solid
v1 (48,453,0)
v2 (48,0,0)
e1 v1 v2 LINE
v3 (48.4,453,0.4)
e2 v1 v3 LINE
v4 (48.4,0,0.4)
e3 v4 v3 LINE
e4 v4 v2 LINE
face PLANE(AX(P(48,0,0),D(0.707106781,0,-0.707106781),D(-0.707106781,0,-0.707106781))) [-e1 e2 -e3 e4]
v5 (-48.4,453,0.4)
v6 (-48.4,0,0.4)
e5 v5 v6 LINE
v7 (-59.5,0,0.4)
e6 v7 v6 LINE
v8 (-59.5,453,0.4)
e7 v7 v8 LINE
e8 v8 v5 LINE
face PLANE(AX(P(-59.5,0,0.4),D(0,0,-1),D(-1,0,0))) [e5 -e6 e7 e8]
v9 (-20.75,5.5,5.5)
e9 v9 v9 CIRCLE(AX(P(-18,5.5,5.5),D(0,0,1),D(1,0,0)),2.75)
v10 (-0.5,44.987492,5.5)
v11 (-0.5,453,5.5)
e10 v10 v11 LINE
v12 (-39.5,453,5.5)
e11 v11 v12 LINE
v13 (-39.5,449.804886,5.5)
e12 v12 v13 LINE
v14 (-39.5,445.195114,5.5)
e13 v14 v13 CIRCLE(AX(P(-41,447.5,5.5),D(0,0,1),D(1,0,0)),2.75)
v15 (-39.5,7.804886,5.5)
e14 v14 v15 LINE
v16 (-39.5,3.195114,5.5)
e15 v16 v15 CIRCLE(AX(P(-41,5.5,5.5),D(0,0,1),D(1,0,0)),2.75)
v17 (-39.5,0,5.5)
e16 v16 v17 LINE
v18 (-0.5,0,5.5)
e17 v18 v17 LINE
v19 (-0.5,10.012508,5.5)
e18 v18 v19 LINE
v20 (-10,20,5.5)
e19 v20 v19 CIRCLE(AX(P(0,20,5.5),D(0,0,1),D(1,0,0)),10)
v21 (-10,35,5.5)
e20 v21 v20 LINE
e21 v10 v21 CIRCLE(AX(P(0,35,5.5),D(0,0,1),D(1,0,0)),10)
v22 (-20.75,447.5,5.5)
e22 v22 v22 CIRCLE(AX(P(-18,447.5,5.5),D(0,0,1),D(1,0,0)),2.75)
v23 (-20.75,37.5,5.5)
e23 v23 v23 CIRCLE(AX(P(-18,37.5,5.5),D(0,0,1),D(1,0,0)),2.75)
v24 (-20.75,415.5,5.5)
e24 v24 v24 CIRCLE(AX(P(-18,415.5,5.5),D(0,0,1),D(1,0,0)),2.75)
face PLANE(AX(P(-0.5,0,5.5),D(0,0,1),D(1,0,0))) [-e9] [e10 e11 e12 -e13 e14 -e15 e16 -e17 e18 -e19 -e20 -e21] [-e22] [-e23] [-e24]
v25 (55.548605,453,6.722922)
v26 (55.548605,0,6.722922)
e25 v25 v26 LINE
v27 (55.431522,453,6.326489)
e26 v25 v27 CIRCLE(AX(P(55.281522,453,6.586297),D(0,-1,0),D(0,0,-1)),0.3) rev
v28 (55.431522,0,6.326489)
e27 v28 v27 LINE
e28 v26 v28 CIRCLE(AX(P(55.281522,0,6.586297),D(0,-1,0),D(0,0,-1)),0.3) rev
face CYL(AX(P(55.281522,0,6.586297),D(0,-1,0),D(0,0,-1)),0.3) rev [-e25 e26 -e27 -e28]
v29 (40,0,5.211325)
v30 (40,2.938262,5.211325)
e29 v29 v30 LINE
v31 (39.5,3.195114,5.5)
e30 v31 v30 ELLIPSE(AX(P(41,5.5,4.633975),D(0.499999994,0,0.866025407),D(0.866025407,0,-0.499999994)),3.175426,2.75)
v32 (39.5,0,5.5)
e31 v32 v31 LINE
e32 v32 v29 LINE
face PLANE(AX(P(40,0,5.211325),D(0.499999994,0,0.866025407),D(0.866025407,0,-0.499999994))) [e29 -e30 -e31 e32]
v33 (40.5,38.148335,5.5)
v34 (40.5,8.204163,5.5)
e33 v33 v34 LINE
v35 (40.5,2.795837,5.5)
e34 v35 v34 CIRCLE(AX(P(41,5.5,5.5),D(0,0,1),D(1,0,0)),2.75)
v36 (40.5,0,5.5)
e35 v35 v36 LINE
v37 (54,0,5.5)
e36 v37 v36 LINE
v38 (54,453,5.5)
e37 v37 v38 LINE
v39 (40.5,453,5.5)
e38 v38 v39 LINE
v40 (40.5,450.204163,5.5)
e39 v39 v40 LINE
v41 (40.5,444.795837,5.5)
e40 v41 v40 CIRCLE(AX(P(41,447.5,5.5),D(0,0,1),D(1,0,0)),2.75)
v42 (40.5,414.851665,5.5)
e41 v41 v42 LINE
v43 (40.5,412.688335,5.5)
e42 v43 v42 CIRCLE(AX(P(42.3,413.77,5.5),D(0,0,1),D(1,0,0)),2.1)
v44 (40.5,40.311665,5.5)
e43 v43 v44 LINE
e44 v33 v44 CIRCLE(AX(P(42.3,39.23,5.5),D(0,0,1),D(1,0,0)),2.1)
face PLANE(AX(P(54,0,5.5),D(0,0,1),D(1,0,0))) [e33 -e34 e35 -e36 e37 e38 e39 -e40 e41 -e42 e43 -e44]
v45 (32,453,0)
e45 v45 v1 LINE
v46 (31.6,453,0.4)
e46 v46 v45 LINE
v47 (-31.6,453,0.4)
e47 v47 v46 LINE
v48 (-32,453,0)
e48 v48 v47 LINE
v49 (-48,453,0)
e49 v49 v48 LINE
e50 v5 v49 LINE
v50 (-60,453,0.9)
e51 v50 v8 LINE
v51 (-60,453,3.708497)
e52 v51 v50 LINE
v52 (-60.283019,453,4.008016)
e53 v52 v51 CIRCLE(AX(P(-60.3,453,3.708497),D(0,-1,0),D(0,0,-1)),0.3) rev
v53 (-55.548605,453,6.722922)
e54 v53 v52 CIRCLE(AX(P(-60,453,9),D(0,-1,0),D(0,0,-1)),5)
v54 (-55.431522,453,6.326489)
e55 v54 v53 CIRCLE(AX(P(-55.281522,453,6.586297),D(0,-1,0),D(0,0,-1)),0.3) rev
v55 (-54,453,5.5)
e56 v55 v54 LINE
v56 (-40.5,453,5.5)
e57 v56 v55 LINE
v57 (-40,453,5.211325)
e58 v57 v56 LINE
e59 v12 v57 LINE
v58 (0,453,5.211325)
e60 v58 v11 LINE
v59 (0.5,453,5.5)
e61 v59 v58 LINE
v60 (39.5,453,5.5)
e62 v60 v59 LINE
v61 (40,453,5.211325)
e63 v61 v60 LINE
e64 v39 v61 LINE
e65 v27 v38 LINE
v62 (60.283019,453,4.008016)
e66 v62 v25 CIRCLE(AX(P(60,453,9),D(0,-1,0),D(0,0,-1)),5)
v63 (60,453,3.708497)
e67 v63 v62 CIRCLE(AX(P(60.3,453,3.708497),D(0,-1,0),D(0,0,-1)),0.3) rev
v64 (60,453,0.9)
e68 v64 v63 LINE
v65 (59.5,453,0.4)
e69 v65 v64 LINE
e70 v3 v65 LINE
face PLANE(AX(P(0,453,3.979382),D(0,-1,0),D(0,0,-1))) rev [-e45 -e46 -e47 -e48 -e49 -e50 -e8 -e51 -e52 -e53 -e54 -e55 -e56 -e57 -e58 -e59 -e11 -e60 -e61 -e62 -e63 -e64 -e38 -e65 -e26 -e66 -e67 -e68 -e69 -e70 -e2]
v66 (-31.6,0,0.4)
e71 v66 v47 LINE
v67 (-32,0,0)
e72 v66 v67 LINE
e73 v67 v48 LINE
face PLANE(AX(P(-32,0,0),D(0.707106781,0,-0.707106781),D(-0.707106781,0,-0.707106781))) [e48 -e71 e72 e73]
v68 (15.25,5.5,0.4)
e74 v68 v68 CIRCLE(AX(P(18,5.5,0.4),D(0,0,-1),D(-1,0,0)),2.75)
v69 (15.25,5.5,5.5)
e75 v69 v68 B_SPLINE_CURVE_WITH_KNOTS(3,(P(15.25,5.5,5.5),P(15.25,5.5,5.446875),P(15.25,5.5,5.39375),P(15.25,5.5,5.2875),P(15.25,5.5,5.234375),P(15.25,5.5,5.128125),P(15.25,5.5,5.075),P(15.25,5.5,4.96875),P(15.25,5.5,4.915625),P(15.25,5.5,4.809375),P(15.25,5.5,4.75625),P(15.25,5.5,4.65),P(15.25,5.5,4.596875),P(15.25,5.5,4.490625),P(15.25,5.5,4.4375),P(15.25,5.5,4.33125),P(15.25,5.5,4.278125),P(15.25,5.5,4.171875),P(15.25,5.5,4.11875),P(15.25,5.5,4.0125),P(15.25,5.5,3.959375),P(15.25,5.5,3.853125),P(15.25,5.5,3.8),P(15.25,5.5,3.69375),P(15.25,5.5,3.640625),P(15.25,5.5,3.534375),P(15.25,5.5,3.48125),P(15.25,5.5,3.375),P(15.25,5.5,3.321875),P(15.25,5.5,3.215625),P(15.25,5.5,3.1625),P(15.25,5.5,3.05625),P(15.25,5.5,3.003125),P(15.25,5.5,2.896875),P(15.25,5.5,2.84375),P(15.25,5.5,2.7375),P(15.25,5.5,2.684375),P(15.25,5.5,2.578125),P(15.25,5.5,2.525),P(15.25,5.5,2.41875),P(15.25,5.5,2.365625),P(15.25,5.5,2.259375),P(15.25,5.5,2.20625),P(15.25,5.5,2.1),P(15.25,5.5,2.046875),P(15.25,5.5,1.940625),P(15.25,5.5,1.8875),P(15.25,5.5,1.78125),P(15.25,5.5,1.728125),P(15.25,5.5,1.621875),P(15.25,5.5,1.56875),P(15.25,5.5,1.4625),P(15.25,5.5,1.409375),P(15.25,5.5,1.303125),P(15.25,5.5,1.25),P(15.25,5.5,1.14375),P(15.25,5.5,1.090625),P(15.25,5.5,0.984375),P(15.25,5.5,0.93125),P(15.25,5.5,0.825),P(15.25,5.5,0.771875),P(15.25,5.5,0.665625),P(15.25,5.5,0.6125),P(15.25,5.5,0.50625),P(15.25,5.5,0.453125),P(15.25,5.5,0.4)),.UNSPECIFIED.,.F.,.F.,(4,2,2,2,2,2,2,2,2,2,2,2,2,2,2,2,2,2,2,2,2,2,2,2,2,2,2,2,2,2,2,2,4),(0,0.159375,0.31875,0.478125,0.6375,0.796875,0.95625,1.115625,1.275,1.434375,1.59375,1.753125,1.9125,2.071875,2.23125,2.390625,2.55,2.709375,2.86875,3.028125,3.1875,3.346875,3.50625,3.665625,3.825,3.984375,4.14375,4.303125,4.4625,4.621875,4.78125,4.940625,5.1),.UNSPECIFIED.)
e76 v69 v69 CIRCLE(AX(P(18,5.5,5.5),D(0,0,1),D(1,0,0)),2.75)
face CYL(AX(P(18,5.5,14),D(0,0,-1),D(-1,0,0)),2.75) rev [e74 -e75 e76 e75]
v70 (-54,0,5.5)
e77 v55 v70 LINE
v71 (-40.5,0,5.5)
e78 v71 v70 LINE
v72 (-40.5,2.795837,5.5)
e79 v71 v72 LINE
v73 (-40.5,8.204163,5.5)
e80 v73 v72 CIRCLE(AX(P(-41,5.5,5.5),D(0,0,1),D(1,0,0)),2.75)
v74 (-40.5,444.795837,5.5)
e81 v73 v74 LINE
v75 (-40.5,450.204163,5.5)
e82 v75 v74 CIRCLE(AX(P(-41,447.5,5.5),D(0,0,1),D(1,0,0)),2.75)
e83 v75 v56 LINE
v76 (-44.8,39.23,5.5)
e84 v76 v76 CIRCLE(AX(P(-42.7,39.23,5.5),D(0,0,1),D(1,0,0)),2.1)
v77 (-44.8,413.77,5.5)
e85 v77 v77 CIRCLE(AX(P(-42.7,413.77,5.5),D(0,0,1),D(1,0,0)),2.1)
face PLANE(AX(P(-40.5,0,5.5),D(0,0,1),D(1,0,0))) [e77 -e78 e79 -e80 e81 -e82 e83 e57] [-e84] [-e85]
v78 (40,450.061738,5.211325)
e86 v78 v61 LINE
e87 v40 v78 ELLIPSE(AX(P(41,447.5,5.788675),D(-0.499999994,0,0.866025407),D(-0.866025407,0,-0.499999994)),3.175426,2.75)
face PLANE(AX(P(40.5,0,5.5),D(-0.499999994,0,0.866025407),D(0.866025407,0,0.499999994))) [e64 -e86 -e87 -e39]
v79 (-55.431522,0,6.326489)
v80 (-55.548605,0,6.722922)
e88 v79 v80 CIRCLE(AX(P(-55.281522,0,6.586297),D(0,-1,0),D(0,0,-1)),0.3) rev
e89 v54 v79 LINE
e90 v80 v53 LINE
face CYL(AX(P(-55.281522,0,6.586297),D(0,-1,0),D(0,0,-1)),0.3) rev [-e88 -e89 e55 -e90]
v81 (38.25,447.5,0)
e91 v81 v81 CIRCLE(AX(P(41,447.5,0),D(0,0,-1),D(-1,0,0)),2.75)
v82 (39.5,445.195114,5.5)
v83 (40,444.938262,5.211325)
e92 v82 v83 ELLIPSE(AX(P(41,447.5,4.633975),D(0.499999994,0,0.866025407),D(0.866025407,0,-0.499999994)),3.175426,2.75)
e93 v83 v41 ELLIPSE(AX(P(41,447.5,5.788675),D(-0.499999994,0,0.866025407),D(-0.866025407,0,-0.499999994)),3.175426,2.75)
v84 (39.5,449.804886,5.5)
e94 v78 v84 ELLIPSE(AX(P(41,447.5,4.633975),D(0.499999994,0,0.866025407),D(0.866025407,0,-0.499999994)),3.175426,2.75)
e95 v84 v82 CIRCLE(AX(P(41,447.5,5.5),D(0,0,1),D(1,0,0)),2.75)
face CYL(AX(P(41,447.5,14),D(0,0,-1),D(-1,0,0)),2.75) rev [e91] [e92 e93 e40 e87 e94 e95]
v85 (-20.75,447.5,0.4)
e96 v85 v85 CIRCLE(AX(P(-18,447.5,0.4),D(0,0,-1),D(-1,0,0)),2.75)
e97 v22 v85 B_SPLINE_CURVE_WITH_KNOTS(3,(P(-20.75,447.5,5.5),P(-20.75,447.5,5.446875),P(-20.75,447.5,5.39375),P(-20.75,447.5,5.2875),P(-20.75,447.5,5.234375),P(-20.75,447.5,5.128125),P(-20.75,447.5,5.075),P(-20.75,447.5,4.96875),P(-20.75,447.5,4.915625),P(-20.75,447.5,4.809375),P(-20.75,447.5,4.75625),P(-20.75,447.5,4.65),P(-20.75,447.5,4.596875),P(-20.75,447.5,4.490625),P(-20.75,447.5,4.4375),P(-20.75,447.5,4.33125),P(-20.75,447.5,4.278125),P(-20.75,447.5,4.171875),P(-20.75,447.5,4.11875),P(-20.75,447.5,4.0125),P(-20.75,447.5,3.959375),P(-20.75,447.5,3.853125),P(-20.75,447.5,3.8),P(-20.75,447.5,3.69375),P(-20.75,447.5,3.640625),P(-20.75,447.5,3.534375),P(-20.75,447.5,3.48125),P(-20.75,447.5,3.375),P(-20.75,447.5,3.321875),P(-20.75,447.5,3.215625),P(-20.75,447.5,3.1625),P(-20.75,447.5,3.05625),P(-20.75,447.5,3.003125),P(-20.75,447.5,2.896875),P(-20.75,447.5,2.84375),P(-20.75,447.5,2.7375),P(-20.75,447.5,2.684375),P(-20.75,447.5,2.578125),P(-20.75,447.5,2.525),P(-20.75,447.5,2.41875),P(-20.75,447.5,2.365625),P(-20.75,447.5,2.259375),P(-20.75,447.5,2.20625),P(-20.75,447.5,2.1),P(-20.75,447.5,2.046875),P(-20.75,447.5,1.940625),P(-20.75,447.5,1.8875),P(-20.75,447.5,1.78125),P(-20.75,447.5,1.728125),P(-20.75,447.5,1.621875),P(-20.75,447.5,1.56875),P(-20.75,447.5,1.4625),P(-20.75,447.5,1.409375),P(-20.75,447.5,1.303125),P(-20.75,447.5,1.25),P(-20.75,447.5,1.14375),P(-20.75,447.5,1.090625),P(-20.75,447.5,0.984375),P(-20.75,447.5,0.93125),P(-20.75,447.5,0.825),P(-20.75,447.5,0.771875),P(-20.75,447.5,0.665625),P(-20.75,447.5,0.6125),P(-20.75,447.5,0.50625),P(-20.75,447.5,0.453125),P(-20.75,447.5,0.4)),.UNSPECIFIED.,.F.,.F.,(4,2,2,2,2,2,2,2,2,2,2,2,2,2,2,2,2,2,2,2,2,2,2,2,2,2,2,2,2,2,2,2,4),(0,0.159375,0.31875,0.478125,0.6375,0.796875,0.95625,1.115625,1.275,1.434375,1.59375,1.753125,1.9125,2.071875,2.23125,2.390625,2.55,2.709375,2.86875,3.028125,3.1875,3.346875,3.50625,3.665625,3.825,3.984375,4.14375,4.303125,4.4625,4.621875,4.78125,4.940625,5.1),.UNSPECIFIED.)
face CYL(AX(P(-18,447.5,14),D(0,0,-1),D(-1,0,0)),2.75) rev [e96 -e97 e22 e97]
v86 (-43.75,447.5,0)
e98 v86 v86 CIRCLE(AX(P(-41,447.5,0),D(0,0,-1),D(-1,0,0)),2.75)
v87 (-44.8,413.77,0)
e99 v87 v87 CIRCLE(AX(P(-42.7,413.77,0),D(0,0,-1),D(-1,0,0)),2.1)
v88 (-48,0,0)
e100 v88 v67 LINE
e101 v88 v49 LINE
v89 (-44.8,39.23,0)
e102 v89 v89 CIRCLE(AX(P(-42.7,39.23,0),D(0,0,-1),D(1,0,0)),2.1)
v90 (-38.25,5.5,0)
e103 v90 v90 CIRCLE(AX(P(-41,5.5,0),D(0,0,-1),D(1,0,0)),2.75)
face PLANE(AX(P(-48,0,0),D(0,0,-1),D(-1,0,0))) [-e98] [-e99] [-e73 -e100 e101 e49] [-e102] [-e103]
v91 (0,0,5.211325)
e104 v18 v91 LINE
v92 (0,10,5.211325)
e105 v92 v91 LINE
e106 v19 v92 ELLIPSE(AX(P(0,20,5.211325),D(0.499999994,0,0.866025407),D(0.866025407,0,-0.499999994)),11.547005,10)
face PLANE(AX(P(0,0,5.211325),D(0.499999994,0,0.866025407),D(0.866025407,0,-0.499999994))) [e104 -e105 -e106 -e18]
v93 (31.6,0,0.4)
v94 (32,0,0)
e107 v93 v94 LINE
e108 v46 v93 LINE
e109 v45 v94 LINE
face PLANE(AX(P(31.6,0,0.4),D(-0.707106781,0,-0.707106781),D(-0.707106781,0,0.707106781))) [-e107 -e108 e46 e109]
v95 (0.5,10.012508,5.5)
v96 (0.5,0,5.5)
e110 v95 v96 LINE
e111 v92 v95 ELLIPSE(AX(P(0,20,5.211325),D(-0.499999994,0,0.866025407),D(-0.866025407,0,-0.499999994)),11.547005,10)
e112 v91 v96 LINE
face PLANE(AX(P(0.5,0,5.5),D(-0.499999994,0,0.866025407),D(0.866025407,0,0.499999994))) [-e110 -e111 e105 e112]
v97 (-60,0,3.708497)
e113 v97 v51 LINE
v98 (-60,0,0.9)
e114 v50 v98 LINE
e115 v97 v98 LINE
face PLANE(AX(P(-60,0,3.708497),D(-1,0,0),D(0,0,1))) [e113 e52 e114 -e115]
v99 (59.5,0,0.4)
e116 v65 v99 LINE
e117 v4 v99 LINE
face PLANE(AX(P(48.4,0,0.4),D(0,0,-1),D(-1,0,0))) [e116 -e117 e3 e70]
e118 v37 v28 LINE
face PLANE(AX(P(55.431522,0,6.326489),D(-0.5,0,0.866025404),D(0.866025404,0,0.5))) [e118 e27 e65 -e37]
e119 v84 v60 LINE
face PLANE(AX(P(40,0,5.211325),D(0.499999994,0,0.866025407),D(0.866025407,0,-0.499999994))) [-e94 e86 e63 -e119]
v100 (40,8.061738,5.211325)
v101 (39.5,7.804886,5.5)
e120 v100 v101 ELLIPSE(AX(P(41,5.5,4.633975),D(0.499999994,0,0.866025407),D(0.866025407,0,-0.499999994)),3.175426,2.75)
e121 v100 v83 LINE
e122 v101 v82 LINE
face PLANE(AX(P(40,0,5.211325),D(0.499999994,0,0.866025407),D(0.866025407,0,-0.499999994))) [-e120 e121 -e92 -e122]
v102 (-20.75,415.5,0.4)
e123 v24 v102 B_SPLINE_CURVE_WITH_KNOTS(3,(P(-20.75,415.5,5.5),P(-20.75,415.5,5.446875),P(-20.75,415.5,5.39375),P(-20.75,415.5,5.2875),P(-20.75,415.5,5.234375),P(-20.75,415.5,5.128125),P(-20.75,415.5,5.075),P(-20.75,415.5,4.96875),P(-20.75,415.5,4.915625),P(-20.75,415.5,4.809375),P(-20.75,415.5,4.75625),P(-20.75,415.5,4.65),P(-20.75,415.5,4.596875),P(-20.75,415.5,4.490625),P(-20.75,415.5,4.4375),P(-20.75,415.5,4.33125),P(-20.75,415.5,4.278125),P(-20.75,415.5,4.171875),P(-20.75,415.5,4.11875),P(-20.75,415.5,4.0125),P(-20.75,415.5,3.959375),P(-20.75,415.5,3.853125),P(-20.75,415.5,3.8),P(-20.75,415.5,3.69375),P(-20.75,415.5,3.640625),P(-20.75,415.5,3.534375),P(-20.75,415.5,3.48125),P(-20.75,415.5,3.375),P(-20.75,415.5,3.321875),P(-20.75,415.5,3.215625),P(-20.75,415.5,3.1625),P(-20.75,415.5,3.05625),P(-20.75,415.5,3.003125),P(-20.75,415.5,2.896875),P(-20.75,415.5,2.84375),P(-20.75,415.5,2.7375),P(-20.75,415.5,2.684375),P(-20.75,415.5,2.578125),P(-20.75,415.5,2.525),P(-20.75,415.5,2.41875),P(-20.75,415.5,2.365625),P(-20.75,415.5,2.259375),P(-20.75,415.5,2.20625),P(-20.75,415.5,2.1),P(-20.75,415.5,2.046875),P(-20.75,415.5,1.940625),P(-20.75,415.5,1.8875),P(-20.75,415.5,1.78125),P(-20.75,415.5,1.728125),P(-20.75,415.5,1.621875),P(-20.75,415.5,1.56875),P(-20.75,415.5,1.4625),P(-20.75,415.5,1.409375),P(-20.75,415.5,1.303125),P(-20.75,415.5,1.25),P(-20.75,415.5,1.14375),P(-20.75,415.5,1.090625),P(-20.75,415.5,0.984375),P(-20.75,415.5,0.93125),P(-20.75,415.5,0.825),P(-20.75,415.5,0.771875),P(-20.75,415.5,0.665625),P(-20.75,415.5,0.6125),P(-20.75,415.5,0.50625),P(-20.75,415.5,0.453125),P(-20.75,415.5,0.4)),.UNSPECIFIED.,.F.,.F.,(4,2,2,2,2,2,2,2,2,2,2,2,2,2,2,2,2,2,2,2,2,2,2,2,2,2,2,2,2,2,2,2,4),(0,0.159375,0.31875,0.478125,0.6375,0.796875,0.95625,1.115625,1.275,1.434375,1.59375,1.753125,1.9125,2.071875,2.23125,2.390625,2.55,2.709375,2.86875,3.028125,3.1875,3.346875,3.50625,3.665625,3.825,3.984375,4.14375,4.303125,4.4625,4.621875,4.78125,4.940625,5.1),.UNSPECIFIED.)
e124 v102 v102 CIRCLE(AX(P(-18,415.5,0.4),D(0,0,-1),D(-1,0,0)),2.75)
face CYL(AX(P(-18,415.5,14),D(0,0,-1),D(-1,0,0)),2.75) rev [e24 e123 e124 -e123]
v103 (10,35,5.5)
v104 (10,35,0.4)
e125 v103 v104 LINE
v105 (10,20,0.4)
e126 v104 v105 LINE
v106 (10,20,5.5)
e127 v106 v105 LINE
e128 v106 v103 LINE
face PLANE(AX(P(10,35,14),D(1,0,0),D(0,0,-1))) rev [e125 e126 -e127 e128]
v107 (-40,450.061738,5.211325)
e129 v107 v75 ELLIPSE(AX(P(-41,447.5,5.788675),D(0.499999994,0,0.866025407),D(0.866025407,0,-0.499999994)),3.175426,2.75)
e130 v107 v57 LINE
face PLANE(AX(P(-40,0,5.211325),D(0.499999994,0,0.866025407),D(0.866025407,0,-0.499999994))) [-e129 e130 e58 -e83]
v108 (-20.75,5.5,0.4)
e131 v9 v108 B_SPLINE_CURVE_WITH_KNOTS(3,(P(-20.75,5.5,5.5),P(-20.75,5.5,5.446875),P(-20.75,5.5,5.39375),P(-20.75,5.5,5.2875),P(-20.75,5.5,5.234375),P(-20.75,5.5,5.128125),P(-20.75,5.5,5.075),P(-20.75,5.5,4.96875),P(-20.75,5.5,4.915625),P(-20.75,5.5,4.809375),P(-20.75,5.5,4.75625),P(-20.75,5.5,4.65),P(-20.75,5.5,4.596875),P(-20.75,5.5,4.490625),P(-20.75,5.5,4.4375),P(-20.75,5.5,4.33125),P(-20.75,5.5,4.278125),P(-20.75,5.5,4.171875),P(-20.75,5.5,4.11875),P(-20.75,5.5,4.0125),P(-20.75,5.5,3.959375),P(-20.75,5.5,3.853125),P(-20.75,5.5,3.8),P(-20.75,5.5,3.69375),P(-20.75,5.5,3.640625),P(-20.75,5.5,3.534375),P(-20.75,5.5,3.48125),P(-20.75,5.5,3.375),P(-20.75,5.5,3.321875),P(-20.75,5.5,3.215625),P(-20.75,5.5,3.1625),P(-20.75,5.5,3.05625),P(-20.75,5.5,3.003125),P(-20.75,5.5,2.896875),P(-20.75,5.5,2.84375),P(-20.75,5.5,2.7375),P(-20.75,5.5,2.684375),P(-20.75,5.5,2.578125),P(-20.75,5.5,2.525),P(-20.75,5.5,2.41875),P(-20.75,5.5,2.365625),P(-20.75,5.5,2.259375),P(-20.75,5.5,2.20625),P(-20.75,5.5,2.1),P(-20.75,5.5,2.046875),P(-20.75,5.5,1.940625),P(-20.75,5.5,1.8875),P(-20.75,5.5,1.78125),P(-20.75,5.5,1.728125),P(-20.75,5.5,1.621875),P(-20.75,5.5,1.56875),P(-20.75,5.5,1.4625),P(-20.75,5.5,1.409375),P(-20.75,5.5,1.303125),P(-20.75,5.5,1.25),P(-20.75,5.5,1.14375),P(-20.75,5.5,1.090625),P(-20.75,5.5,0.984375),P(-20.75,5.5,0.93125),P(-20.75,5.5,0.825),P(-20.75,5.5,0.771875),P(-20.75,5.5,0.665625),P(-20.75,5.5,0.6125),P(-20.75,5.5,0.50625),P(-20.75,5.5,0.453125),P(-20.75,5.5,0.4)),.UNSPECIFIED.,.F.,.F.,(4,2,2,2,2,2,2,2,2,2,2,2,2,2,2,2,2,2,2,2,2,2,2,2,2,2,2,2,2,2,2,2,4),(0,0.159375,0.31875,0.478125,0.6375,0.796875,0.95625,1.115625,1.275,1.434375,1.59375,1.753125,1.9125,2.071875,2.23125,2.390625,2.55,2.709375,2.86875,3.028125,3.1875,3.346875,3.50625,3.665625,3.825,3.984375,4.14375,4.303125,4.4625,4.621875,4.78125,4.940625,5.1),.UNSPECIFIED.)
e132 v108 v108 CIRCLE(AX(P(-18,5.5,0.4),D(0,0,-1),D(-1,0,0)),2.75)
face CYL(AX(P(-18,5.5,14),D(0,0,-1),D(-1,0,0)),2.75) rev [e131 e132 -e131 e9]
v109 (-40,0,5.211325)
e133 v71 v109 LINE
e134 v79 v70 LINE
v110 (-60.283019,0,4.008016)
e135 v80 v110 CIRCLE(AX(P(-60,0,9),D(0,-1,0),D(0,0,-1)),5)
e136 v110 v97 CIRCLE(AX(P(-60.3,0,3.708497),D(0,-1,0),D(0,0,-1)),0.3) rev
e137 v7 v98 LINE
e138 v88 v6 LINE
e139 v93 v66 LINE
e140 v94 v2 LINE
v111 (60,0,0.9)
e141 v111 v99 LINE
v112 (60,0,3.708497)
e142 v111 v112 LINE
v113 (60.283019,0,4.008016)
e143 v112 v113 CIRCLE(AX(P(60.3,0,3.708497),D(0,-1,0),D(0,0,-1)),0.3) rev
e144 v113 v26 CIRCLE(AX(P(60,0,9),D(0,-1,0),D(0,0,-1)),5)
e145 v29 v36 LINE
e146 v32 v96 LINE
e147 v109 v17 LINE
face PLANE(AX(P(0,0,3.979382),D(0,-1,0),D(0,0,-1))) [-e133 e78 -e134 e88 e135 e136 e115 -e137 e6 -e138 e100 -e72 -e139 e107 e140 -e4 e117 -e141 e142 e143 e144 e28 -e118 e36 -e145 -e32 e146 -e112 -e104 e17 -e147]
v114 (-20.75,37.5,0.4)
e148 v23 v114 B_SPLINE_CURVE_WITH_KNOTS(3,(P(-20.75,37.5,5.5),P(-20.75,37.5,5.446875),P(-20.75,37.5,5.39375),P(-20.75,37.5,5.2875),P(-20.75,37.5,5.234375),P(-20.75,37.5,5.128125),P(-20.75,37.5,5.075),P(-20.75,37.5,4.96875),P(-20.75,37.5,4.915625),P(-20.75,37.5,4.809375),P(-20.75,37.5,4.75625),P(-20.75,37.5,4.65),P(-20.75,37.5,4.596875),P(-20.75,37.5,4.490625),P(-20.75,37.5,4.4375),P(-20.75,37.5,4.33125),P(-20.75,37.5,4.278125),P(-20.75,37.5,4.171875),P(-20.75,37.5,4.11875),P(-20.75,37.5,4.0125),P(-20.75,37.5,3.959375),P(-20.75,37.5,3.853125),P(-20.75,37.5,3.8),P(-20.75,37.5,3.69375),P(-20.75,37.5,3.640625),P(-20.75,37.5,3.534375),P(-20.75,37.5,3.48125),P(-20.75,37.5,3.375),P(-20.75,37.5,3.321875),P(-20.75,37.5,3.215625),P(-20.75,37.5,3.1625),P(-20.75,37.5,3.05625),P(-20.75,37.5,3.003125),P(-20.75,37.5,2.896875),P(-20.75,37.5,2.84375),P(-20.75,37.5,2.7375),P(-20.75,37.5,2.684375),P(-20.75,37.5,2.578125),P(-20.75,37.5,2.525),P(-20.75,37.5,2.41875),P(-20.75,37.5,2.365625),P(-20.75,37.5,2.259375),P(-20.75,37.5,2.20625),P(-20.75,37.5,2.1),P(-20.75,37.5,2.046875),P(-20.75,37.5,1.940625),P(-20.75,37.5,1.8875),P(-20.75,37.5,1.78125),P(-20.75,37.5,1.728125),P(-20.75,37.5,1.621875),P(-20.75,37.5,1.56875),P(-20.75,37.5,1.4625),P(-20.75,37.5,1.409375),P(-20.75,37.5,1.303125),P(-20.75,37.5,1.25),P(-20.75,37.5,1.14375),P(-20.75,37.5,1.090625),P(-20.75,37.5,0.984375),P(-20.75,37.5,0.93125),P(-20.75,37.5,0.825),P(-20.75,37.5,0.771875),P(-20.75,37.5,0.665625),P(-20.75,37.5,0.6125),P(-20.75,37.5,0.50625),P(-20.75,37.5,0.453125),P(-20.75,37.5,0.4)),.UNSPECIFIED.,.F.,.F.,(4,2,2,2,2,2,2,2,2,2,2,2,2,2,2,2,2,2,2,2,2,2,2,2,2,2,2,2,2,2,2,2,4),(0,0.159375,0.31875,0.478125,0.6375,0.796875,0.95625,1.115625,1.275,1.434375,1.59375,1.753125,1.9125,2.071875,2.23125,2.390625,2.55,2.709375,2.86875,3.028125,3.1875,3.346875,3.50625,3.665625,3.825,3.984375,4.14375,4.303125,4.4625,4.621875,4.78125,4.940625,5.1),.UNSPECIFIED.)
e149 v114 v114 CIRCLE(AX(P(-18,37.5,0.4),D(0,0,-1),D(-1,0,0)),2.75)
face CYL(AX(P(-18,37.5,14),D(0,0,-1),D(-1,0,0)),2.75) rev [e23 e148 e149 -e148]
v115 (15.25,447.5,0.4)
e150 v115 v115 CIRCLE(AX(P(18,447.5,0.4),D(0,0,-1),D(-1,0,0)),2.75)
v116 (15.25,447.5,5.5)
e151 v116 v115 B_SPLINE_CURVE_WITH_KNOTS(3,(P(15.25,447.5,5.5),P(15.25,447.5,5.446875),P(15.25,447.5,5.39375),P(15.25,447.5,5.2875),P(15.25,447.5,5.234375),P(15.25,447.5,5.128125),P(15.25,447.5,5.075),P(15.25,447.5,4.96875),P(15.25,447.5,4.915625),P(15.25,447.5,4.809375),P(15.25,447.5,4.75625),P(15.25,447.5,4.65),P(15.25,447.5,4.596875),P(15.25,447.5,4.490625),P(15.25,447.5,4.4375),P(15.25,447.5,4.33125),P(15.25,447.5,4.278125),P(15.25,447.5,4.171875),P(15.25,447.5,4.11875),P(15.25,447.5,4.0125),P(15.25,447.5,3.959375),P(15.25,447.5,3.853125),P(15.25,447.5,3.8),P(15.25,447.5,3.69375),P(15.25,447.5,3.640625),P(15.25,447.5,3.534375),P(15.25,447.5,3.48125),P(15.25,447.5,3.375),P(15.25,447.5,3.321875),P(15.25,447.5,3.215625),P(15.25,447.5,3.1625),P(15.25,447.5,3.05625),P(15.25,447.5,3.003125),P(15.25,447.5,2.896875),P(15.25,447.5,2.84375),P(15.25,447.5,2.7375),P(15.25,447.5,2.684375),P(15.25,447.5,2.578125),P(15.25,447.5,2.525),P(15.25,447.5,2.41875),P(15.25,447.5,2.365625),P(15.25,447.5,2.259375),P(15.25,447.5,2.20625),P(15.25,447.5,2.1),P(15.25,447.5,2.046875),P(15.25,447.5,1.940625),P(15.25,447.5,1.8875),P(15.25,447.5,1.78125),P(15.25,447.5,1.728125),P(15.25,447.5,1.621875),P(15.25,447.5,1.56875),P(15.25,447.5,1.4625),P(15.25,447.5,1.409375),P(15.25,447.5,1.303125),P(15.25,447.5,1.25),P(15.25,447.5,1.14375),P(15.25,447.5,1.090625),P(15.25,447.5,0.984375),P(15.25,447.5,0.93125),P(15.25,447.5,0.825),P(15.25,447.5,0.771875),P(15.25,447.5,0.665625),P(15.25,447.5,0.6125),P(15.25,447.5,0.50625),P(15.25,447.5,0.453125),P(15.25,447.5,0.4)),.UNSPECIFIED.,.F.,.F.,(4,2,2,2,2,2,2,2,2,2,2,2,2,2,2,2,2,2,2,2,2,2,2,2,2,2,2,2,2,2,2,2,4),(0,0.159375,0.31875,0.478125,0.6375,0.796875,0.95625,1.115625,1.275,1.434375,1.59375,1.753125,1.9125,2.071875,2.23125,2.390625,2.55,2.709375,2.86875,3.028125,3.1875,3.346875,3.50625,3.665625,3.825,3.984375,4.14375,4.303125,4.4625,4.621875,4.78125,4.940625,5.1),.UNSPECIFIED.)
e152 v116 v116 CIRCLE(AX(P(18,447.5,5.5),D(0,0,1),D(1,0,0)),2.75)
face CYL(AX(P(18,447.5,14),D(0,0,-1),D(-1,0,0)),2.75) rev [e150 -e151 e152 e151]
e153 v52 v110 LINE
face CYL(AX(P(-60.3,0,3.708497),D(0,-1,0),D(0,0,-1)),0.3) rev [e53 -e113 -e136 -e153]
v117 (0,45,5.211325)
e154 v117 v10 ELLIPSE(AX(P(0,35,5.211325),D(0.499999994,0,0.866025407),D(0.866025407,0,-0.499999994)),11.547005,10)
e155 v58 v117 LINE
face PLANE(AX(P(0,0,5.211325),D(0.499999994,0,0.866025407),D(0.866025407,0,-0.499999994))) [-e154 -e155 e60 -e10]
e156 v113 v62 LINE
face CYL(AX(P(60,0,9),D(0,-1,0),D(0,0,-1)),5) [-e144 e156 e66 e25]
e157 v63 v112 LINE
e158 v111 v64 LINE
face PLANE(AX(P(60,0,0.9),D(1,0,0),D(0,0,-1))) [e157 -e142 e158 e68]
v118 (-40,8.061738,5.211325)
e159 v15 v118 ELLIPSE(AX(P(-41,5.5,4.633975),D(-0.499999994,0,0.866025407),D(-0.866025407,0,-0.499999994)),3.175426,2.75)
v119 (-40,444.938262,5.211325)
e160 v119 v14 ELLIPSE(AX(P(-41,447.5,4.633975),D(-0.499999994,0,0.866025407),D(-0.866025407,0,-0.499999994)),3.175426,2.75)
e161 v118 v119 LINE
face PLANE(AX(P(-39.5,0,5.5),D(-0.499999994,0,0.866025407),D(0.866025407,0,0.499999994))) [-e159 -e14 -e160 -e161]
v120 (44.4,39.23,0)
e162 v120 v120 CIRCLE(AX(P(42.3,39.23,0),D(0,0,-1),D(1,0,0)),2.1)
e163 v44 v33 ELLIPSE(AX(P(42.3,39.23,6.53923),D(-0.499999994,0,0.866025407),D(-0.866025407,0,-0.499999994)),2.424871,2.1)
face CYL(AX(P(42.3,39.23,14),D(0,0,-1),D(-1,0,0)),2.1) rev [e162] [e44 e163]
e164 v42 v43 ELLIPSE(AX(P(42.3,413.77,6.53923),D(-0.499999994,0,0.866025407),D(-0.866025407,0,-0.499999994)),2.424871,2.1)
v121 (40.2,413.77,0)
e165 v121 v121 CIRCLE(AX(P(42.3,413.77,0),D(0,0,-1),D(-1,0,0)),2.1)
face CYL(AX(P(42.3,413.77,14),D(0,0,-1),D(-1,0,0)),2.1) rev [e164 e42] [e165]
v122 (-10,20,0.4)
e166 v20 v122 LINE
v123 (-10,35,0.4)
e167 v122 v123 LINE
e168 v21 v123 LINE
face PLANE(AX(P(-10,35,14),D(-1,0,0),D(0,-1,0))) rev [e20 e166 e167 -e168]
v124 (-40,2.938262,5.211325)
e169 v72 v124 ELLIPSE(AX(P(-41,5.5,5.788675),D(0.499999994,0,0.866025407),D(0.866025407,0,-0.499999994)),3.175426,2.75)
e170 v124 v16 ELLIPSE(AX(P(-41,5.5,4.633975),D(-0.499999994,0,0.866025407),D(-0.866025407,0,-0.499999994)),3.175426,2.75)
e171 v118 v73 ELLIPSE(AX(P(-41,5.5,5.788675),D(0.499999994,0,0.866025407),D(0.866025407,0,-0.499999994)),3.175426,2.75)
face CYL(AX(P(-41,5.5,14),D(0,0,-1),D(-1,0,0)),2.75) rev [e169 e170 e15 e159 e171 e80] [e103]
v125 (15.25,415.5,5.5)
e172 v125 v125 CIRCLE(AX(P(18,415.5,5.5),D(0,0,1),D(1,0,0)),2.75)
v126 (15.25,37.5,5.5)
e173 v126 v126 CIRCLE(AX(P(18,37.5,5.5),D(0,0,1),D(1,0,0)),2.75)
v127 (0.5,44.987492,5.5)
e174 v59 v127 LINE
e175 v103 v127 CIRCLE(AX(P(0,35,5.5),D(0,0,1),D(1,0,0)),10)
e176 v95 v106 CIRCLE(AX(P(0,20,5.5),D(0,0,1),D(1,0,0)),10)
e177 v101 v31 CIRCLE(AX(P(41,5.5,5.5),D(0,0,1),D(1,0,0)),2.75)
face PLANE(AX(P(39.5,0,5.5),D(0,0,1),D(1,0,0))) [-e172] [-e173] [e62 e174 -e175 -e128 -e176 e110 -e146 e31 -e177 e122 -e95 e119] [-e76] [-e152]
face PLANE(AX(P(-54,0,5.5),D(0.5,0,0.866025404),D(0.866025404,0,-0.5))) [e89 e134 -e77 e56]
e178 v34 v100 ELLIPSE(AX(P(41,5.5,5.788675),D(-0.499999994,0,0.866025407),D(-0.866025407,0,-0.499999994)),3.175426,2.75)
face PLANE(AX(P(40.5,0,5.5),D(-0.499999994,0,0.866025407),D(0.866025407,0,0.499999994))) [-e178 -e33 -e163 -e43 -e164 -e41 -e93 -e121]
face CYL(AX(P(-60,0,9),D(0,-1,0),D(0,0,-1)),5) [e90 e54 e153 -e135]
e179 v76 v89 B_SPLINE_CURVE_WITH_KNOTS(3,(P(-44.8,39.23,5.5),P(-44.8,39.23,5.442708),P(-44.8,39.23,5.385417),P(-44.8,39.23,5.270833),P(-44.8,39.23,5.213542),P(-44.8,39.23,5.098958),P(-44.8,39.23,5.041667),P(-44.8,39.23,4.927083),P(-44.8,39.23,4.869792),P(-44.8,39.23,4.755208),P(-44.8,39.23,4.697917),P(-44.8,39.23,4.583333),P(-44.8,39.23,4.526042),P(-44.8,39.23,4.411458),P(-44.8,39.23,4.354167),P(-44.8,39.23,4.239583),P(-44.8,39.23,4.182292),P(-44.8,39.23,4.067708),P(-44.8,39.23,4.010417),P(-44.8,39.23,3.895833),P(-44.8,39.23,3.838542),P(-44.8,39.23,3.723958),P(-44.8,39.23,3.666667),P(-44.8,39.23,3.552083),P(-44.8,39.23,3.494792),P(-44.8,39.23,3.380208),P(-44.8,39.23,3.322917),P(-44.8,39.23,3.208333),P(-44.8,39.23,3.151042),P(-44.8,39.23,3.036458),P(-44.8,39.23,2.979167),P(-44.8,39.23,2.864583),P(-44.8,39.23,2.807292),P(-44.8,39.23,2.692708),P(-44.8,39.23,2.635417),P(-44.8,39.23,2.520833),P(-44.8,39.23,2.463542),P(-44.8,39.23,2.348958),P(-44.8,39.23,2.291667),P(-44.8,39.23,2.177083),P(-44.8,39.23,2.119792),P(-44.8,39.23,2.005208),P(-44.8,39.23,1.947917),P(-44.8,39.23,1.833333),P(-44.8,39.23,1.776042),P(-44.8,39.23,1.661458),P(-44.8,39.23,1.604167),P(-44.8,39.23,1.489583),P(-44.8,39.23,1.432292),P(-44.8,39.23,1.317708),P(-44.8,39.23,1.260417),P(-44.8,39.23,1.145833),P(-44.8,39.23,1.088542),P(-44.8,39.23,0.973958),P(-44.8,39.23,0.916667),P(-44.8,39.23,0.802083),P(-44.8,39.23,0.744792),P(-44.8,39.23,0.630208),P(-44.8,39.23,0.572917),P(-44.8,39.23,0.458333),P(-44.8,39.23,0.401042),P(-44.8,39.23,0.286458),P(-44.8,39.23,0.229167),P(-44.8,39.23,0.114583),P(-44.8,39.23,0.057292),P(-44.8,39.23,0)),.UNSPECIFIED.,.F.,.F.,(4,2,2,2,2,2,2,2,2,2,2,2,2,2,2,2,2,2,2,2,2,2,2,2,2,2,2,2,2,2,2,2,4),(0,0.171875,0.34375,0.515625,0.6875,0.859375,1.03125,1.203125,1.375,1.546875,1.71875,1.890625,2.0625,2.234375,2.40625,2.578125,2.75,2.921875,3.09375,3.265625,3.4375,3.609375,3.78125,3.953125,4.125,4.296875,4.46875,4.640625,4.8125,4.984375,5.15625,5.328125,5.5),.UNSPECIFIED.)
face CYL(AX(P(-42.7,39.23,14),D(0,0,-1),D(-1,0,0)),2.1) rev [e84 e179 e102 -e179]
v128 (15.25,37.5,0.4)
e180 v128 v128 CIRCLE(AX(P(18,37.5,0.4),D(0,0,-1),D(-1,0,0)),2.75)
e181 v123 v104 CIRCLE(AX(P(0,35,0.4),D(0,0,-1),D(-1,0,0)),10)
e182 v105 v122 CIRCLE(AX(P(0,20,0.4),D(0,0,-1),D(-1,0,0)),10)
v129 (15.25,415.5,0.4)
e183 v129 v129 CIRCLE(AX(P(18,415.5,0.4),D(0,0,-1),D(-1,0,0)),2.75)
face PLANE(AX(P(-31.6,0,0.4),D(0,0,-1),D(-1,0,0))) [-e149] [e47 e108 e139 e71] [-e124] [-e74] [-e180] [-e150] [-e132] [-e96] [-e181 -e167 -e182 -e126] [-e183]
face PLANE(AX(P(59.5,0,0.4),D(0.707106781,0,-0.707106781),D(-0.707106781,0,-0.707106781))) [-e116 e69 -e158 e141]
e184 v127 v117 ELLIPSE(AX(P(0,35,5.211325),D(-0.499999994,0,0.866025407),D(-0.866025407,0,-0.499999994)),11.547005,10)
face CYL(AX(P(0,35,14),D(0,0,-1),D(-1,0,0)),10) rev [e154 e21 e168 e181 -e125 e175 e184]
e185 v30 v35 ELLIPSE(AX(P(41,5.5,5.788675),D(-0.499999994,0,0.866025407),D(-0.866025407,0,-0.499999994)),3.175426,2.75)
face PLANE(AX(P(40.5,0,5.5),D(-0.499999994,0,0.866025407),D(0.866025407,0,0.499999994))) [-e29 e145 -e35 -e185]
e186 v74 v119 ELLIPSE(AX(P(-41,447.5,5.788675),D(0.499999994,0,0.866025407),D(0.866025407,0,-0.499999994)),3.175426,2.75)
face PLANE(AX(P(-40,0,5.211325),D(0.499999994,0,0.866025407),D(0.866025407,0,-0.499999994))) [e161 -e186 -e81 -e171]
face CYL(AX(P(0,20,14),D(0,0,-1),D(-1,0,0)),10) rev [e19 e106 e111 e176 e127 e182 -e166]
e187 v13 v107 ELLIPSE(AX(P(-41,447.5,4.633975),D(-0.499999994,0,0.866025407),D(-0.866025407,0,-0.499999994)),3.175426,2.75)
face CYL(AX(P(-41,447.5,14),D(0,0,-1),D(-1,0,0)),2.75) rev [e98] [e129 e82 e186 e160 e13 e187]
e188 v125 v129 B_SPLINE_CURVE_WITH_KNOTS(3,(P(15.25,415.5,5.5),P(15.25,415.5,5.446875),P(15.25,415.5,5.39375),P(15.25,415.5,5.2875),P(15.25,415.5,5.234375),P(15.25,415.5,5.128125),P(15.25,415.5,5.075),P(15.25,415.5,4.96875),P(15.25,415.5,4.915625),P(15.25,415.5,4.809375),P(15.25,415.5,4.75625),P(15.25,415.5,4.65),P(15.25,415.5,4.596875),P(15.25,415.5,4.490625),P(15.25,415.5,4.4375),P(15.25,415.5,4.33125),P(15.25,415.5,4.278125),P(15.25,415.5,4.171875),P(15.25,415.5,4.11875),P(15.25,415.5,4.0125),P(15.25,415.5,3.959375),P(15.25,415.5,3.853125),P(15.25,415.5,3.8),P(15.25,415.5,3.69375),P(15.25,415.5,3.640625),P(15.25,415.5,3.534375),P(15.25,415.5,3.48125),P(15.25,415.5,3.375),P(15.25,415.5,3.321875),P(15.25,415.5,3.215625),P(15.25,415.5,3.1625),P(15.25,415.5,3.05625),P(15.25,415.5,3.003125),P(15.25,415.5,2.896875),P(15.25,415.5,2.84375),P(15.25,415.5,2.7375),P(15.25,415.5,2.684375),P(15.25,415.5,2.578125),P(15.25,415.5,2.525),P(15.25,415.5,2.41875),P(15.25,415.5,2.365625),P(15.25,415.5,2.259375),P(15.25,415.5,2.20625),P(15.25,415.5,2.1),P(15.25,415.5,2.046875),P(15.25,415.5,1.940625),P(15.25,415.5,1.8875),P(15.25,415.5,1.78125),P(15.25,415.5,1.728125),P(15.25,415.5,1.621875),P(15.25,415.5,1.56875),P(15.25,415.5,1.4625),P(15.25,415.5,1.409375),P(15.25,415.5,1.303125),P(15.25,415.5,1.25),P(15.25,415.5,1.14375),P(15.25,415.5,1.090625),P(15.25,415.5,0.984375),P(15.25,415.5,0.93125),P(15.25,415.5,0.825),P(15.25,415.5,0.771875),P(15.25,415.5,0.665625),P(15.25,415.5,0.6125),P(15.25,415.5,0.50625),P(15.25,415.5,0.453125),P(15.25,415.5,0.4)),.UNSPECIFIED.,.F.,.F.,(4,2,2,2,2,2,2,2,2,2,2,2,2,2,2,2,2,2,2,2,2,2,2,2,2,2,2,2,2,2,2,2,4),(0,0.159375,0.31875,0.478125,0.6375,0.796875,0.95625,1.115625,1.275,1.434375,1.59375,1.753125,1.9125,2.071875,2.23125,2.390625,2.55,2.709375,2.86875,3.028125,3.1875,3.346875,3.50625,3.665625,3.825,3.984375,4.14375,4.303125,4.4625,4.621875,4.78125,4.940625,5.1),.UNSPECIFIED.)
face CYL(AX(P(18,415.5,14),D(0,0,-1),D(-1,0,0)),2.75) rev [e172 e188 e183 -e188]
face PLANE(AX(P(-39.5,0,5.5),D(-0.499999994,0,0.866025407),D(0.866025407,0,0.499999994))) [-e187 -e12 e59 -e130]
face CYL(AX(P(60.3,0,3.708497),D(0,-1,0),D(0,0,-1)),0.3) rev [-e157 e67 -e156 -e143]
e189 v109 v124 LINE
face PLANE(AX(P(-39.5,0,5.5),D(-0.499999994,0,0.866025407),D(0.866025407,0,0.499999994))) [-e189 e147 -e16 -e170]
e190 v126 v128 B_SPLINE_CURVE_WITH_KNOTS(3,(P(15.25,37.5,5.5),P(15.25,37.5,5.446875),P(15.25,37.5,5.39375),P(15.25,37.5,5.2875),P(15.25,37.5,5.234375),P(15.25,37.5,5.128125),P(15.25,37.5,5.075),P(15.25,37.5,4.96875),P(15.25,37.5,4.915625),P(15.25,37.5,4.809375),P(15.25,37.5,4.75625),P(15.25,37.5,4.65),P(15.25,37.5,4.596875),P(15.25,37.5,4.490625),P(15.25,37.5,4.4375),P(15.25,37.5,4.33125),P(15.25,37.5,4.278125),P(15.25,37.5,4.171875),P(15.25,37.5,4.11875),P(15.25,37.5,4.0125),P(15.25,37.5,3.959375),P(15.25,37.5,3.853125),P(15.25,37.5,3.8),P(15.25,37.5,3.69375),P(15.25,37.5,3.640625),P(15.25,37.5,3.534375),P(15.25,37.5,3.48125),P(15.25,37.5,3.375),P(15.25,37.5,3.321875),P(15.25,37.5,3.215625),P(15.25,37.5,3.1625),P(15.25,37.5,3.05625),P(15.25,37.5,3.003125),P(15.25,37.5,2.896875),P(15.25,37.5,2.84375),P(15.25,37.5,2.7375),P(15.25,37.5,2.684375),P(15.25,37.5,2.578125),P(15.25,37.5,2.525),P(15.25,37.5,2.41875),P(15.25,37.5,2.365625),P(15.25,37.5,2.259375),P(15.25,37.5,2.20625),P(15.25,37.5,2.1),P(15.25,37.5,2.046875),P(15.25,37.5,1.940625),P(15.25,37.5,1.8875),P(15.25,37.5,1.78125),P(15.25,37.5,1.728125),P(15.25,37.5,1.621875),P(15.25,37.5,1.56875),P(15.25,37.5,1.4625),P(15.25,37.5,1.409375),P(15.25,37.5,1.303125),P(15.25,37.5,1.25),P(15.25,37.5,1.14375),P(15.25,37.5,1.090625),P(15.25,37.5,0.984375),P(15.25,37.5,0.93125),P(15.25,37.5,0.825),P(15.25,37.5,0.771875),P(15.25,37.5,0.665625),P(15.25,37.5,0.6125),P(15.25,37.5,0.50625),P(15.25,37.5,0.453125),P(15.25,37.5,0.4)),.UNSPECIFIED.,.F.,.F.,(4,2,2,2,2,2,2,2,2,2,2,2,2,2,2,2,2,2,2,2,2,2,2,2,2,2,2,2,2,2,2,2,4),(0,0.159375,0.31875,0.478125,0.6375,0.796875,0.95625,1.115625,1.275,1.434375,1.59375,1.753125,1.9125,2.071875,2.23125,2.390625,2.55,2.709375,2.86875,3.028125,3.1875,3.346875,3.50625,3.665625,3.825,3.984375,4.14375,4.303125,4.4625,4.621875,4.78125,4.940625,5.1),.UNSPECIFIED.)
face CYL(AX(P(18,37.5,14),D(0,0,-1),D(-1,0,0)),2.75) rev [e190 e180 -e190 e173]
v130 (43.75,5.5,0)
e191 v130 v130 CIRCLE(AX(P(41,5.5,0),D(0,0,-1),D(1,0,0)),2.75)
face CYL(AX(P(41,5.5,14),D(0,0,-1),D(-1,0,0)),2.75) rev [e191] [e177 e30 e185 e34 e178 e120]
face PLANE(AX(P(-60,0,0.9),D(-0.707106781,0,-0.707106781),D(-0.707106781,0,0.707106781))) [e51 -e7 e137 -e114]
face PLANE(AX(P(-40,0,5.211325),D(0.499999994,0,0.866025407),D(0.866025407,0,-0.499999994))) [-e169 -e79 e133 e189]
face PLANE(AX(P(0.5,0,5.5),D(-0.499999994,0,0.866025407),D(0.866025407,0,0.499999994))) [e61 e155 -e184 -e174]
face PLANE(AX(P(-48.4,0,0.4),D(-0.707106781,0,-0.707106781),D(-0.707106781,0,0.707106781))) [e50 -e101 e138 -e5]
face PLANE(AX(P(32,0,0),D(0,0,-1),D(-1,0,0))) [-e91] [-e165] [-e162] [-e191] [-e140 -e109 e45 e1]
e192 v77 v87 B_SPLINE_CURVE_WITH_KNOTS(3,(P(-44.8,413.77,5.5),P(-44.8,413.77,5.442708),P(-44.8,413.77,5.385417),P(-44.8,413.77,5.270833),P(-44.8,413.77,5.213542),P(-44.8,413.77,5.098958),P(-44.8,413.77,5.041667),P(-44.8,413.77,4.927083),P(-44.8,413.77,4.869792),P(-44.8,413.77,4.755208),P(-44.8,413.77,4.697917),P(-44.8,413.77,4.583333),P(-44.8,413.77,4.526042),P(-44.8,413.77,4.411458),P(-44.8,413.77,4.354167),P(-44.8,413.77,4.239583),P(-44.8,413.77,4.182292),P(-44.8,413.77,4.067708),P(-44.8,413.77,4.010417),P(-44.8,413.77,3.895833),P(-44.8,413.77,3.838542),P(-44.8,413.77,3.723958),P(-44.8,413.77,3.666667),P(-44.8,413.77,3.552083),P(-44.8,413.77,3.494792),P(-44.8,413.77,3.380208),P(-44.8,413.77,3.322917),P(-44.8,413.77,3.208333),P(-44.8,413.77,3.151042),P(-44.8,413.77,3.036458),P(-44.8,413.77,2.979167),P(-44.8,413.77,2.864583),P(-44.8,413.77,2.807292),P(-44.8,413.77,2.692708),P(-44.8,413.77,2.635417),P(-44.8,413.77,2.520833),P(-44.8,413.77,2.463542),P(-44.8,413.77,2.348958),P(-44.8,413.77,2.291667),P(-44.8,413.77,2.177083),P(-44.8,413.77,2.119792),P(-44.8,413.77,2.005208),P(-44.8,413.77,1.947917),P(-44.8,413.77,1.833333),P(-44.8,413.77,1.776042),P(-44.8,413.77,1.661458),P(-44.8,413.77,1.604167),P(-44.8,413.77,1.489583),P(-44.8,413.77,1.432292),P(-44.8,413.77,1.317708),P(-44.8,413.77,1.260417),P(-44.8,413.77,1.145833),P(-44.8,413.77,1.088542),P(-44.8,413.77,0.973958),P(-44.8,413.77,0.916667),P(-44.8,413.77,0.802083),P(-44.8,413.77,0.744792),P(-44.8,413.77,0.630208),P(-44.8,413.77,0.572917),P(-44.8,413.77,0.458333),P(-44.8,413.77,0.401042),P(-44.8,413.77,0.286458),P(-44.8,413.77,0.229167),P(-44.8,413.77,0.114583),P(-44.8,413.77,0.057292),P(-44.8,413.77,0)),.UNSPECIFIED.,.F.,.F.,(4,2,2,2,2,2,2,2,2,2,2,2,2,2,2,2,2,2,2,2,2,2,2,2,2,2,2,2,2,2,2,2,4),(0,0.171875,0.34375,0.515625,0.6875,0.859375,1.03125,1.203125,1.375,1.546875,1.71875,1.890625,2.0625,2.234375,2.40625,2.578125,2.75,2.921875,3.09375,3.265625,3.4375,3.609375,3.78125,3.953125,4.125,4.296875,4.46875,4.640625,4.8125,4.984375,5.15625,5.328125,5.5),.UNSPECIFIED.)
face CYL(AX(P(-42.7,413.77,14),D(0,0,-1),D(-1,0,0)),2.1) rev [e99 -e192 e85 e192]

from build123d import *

# Parameters (mm, degrees)
BOSS_EXTRUDE1_DEPTH      = 253
BOSS_EXTRUDE1_DEPTH_BACK = 200
SKETCH2_R                = 2.75
CUT_EXTRUDE1_DEPTH       = 458.853688421
SKETCH3_R                = 2.1
CUT_EXTRUDE2_DEPTH       = 458.853688421
CUT_EXTRUDE3_DEPTH       = 458.841632009


# Read off the part's stored shape, not the designer's step: Imported1
with BuildPart() as part:
    # Sketch1 → Boss-Extrude1 (new, two sides: drawn at the far end of the back side and taken through both)
    with BuildSketch(Plane(origin=(0, 200, 0), x_dir=(1, 0, 0), z_dir=(0, 1, 0)).offset(-BOSS_EXTRUDE1_DEPTH_BACK)):
        with BuildLine():
            Line((0, -5.21132487), (0.5, -5.5))
            Line((0.5, -5.5), (39.5, -5.5))
            Line((39.5, -5.5), (40, -5.21132487))
            Line((40, -5.21132487), (40.5, -5.5))
            Line((40.5, -5.5), (54, -5.5))
            Line((54, -5.5), (55.431521652, -6.326489411))
            ThreePointArc((55.431521652, -6.326489411), (55.569235651, -6.501322592), (55.548605331, -6.722921727))
            ThreePointArc((55.548605331, -6.722921727), (62.487270984, -13.337451224), (60.283018873, -4.0080164))
            ThreePointArc((60.283018873, -4.0080164), (60.081946867, -3.914538227), (60, -3.708497377))
            Line((60, -3.708497377), (60, -0.9))
            Line((60, -0.9), (59.5, -0.4))
            Line((59.5, -0.4), (48.4, -0.4))
            Line((48.4, -0.4), (48, 0))
            Line((48, 0), (32, 0))
            Line((32, 0), (31.6, -0.4))
            Line((31.6, -0.4), (-31.6, -0.4))
            Line((-31.6, -0.4), (-32, 0))
            Line((-32, 0), (-48, 0))
            Line((-48, 0), (-48.4, -0.4))
            Line((-48.4, -0.4), (-59.5, -0.4))
            Line((-59.5, -0.4), (-60, -0.9))
            Line((-60, -0.9), (-60, -3.708497387))
            ThreePointArc((-60, -3.708497387), (-60.081946862, -3.914538232), (-60.283018865, -4.0080164))
            ThreePointArc((-60.283018865, -4.0080164), (-62.487270987, -13.337451222), (-55.548605331, -6.722921727))
            ThreePointArc((-55.548605331, -6.722921727), (-55.569235651, -6.501322592), (-55.431521652, -6.326489411))
            Line((-55.431521652, -6.326489411), (-54, -5.5))
            Line((-54, -5.5), (-40.5, -5.5))
            Line((-40.5, -5.5), (-40, -5.21132487))
            Line((-40, -5.21132487), (-39.5, -5.5))
            Line((-39.5, -5.5), (-0.5, -5.5))
            Line((-0.5, -5.5), (0, -5.21132487))
        make_face()
    extrude(amount=BOSS_EXTRUDE1_DEPTH + BOSS_EXTRUDE1_DEPTH_BACK)

    # Sketch2 → Cut-Extrude1 (cut, through all)
    with BuildSketch(Plane(origin=(0, 0, 0), x_dir=(-1, 0, 0), z_dir=(0, 0, -1))):
        with Locations((-18, 415.5)):
            Circle(SKETCH2_R)
        with Locations((18, 415.5)):
            Circle(SKETCH2_R)
        with Locations((-18, 37.5)):
            Circle(SKETCH2_R)
        with Locations((18, 37.5)):
            Circle(SKETCH2_R)
        with Locations((-41, 447.5)):
            Circle(SKETCH2_R)
        with Locations((-18, 447.5)):
            Circle(SKETCH2_R)
        with Locations((18, 447.5)):
            Circle(SKETCH2_R)
        with Locations((41, 447.5)):
            Circle(SKETCH2_R)
        with Locations(Location((-41, 5.5, 0), (0, 0, 303.055731151))):
            Circle(SKETCH2_R)
        with Locations((-18, 5.5)):
            Circle(SKETCH2_R)
        with Locations((18, 5.5)):
            Circle(SKETCH2_R)
        with Locations(Location((41, 5.5, 0), (0, 0, 100.475681696))):
            Circle(SKETCH2_R)
    extrude(amount=-CUT_EXTRUDE1_DEPTH, mode=Mode.SUBTRACT)

    # Sketch3 → Cut-Extrude2 (cut, through all)
    with BuildSketch(Plane(origin=(0, 0, 0), x_dir=(-1, 0, 0), z_dir=(0, 0, -1))):
        with Locations((-42.3, 413.77)):
            Circle(SKETCH3_R)
        with Locations((42.7, 413.77)):
            Circle(SKETCH3_R)
        with Locations(Location((-42.3, 39.23, 0), (0, 0, 31.002719134))):
            Circle(SKETCH3_R)
        with Locations((42.7, 39.23)):
            Circle(SKETCH3_R)
    extrude(amount=-CUT_EXTRUDE2_DEPTH, mode=Mode.SUBTRACT)

    # Sketch4 → Cut-Extrude3 (cut, through all)
    with BuildSketch(Plane(origin=(0, 0, 0.4), x_dir=(-1, 0, 0), z_dir=(0, 0, -1))):
        with BuildLine():
            Line((10, 35), (10, 20))
            ThreePointArc((10, 20), (0, 10), (-10, 20))
            Line((-10, 20), (-10, 35))
            ThreePointArc((-10, 35), (0, 45), (10, 35))
        make_face()
    extrude(amount=-CUT_EXTRUDE3_DEPTH, mode=Mode.SUBTRACT)


solid = part.part
